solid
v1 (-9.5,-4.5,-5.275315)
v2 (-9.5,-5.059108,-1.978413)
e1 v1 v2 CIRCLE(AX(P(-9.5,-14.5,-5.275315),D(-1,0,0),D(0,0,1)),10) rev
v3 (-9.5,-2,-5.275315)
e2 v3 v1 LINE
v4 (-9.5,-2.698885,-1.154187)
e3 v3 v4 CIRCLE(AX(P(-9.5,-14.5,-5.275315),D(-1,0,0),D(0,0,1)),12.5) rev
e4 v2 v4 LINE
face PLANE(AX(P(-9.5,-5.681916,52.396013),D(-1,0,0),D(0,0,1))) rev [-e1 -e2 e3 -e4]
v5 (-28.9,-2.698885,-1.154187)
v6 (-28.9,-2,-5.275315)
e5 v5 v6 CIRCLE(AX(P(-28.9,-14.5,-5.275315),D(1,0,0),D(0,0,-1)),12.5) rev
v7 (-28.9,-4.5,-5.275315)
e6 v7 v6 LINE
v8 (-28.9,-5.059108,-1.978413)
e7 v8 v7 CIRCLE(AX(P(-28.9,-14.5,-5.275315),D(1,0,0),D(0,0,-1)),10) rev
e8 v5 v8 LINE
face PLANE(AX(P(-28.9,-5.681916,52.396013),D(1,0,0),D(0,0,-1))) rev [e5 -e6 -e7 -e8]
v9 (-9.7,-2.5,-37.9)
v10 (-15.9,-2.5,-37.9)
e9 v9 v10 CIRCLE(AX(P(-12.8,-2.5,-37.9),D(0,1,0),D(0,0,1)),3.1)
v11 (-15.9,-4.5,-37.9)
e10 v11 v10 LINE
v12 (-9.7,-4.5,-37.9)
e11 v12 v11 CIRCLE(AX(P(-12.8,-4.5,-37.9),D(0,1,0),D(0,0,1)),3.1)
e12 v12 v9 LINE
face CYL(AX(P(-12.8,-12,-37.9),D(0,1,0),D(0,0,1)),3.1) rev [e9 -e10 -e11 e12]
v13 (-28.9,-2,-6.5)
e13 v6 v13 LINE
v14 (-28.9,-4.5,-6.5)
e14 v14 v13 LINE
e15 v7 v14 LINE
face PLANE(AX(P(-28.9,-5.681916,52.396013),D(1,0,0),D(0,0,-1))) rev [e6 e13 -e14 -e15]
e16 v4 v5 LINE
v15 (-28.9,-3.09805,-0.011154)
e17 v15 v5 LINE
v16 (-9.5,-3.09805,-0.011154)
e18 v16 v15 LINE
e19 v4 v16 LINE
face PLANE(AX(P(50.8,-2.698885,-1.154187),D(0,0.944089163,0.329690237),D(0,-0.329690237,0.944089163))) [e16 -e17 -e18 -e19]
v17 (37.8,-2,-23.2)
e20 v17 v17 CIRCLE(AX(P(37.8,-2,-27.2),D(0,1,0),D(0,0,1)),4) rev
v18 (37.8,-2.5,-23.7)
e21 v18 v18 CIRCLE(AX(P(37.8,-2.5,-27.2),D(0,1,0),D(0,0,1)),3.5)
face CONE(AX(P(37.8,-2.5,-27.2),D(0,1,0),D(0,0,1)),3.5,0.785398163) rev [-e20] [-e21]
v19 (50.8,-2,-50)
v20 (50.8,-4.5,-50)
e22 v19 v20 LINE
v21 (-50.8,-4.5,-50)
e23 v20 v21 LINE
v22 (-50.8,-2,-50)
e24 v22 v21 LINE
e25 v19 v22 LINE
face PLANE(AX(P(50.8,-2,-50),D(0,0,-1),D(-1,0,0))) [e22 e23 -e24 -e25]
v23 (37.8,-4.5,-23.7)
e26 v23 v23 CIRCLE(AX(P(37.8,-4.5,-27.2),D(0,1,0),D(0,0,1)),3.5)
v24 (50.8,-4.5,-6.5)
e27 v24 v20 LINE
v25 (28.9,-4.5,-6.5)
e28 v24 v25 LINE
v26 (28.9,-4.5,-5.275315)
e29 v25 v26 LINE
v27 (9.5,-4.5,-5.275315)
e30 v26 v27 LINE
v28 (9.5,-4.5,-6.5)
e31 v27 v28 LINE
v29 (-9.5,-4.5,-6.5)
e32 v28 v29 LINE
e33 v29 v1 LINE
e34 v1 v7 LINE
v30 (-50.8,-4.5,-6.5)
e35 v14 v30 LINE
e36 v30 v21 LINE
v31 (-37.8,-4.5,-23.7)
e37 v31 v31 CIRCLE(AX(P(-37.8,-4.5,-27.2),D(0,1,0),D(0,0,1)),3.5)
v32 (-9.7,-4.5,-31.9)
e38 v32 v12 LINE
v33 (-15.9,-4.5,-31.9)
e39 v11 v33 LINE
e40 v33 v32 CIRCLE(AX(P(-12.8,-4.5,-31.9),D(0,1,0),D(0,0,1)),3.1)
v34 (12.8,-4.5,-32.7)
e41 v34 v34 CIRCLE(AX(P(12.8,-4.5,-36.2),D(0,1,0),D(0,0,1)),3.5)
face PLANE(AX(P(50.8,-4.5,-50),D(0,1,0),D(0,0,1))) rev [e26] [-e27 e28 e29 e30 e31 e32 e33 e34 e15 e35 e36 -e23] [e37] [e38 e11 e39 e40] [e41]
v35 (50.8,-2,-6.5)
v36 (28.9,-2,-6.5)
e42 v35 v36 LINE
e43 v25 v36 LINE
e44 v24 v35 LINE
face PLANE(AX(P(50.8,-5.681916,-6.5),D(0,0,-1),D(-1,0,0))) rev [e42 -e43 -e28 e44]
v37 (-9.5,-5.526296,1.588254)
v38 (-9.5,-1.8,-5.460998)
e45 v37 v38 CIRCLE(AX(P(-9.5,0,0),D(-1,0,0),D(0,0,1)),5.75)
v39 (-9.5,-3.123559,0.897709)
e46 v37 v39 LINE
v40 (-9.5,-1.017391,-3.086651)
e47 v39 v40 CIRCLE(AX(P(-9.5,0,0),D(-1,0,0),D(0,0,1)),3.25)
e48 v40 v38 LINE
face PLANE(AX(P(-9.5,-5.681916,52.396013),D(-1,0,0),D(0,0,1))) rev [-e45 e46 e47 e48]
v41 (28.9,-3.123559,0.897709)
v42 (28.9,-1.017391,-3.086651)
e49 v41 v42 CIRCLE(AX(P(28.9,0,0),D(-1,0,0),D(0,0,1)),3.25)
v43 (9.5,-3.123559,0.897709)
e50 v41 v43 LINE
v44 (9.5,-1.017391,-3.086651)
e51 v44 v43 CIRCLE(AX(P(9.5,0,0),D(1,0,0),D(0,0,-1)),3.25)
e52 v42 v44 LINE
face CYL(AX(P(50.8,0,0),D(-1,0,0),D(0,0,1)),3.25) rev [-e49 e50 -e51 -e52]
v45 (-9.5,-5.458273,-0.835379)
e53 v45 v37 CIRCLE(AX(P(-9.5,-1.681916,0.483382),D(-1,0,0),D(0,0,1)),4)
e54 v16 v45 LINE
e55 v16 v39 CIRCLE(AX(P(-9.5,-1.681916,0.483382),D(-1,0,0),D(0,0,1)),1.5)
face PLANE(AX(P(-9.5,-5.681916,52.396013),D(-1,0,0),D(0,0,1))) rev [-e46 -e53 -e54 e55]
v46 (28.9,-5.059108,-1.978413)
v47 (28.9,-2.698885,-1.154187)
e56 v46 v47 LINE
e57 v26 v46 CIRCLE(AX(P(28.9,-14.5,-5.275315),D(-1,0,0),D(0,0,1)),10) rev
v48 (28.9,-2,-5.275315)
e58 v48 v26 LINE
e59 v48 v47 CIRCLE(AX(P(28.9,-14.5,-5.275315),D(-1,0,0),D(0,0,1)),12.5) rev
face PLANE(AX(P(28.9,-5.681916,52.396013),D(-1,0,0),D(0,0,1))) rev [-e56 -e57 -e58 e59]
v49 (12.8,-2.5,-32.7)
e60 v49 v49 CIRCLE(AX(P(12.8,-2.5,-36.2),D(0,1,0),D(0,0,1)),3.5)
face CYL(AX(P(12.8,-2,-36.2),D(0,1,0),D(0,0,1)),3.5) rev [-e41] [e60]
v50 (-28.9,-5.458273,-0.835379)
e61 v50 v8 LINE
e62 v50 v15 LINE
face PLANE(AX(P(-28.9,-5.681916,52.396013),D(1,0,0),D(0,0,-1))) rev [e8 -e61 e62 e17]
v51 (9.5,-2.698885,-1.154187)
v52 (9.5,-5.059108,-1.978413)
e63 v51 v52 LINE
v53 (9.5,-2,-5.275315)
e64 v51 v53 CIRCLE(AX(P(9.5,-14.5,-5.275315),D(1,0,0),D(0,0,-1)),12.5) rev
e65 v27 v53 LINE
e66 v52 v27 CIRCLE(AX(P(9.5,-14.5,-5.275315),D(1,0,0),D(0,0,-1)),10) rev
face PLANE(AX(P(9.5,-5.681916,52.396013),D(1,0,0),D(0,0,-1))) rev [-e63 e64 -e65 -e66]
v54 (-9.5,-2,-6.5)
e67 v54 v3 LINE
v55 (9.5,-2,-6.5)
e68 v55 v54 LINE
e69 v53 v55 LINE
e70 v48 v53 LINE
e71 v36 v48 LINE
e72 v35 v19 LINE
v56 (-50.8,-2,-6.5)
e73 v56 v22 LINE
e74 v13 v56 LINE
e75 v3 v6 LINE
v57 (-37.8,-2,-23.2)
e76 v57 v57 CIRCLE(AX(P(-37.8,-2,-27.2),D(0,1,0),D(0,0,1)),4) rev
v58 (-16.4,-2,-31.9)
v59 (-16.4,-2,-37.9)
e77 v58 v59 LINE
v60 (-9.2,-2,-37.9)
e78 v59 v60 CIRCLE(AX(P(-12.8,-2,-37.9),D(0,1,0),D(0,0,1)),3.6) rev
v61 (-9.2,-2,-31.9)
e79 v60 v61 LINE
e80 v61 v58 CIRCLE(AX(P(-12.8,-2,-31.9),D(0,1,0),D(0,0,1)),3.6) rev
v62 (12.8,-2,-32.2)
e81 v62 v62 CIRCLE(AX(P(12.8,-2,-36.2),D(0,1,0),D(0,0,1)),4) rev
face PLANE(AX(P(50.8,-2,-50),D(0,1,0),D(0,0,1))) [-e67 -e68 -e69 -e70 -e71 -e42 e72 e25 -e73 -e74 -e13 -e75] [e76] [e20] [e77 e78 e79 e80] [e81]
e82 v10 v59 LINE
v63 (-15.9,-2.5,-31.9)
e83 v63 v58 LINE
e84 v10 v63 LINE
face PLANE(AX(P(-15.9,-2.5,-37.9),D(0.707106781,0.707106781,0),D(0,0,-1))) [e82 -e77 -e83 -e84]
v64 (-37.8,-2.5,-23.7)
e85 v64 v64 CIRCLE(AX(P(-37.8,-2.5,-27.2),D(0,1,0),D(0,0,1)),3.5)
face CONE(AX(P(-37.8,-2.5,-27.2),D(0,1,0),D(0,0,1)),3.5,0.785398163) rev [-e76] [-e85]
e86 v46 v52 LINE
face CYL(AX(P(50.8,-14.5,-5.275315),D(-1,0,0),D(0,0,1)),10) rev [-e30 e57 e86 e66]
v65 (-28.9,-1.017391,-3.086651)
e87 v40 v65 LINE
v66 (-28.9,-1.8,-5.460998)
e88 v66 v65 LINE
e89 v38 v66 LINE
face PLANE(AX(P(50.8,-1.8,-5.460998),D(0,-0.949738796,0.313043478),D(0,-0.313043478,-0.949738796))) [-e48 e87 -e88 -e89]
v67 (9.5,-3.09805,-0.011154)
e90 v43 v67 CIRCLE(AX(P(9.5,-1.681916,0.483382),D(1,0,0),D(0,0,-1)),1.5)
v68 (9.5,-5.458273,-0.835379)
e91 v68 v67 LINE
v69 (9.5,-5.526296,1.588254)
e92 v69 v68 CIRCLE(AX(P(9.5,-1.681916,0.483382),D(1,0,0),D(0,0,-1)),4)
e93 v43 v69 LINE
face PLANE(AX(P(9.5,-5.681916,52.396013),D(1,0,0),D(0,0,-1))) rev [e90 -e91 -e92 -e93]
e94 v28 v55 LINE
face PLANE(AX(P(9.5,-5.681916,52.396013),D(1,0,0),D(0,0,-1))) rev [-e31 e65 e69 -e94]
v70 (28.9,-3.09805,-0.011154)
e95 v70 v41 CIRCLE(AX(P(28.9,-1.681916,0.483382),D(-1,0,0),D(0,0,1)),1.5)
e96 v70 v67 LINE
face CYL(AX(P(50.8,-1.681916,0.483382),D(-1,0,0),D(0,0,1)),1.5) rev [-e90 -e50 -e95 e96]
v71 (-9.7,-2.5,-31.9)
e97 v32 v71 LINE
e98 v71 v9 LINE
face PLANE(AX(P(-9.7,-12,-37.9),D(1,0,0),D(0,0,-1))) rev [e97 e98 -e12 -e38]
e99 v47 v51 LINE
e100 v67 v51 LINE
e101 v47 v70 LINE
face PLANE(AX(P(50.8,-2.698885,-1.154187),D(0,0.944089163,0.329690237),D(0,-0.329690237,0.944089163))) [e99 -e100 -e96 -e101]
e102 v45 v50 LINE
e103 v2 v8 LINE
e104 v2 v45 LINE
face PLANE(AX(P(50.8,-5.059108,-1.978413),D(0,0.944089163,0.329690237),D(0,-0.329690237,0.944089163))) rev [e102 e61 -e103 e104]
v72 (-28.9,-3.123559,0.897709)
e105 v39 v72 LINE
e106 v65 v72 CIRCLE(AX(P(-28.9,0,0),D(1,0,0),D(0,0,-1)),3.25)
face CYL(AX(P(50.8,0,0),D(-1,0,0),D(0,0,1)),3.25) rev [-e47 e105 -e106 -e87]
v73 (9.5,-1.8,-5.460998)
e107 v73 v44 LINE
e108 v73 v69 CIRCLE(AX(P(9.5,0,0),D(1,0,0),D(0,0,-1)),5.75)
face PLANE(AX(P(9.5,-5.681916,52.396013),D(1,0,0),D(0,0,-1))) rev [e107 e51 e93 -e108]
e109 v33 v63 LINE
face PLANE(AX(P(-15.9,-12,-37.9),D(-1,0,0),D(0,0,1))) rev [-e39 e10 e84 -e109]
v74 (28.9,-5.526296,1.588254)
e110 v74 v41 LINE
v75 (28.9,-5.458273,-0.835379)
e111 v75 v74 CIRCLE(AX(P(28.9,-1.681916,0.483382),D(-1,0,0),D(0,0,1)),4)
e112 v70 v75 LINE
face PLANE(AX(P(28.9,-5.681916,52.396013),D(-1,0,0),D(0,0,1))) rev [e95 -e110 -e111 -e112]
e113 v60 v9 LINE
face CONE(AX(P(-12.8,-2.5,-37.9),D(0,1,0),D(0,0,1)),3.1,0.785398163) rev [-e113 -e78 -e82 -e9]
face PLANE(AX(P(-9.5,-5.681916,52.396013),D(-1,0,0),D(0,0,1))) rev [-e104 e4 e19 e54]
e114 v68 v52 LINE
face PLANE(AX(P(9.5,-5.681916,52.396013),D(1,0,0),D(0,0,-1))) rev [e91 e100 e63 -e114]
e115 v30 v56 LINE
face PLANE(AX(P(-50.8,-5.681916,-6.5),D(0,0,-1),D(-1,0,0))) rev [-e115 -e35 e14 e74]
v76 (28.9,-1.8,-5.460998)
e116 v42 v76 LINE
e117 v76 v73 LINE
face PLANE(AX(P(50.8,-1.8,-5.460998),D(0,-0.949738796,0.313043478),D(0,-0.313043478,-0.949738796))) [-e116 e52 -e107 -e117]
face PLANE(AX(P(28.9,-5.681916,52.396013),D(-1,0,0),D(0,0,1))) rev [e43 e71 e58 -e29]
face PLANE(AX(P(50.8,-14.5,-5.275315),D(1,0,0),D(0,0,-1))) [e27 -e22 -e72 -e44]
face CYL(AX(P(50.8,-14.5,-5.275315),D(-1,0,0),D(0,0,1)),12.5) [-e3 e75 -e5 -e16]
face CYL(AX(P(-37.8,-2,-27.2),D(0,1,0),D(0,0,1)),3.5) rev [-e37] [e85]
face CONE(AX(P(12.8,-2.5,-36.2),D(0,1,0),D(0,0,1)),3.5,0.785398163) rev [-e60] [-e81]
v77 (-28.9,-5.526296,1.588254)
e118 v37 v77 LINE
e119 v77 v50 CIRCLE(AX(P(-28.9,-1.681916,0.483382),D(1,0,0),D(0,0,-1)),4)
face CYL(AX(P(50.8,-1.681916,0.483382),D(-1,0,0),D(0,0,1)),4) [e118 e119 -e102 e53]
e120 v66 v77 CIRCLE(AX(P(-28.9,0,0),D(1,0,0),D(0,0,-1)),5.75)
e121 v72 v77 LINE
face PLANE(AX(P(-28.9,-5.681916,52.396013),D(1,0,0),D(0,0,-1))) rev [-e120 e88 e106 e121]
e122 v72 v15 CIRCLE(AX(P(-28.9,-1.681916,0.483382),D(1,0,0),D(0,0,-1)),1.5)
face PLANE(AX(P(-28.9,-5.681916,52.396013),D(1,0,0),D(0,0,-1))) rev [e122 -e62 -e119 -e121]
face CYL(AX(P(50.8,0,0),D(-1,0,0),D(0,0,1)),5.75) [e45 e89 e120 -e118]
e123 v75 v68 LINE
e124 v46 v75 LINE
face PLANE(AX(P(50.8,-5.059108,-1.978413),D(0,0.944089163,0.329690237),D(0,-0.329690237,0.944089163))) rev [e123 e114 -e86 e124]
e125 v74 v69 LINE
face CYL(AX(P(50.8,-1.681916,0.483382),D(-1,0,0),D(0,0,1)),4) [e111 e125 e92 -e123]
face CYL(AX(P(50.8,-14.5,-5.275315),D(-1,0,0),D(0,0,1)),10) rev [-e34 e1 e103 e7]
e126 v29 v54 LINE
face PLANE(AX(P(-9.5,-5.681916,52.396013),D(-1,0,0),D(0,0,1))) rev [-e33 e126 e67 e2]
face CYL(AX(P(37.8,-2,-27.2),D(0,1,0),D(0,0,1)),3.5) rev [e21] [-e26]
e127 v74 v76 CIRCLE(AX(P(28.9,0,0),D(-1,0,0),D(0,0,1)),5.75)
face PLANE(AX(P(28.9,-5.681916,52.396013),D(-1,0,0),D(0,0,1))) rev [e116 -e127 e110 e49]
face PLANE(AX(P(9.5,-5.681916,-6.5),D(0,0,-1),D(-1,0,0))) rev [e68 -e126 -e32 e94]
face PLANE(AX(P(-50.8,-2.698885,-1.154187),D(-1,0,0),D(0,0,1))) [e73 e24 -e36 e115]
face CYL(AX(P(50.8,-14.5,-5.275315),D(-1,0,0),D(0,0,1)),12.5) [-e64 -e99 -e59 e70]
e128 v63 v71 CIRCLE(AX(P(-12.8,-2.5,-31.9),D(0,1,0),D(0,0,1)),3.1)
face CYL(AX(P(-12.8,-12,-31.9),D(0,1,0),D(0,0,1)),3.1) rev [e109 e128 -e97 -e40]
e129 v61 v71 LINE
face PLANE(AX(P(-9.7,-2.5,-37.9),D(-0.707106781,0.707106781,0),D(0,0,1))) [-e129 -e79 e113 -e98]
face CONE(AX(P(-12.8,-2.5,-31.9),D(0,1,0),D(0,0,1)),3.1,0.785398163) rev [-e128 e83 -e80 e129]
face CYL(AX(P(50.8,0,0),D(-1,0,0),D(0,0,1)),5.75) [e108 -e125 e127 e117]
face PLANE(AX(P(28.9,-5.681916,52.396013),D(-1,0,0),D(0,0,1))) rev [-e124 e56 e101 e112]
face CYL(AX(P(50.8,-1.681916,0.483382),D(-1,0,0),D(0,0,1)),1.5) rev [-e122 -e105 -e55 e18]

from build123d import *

# Parameters (mm, degrees)
BASE_FLANGE1_DEPTH           = 50.8
CUT_EXTRUDE1_DEPTH           = 72.510156621
CUT_EXTRUDE1_DEPTH_BACK      = 72.510156621
SKETCH6_W                    = 21.9
SKETCH6_H                    = 58.896012785
SKETCH6_W_2                  = 19
F_7_0_7_DIAMETER_HOLE1_D     = 7
F_7_0_7_DIAMETER_HOLE1_DEPTH = 10
F_7_0_7_DIAMETER_HOLE1_TIP   = 2.103012167
CUT_EXTRUDE2_DEPTH           = 10
CHAMFER1_SIZE                = 0.5


# Sheet-metal steps are written as plain solids
with BuildPart() as part:
    # Sketch1 → Base-Flange1 (new, symmetric)
    with BuildSketch(Plane(origin=(0, 0, 0), x_dir=(0, 0, -1), z_dir=(1, 0, 0))):
        with BuildLine():
            Line((50, -4.5), (5.275314915, -4.5))
            ThreePointArc((5.275314915, -4.5), (3.603327521, -4.640767872), (1.978412548, -5.059108369))
            Line((1.978412548, -5.059108369), (0.835379329, -5.458272884))
            ThreePointArc((0.835379329, -5.458272884), (-0.371159142, -5.680341687), (-1.588253888, -5.526296191))
            ThreePointArc((-1.588253888, -5.526296191), (-2.687165368, 5.083467546), (5.460998077, -1.8))
            Line((5.460998077, -1.8), (3.086651087, -1.017391304))
            ThreePointArc((3.086651087, -1.017391304), (-1.518832599, 2.873264265), (-0.897708719, -3.123558716))
            ThreePointArc((-0.897708719, -3.123558716), (-0.44129819, -3.181325777), (0.011153737, -3.098049977))
            Line((0.011153737, -3.098049977), (1.154186957, -2.698885462))
            ThreePointArc((1.154186957, -2.698885462), (3.185330673, -2.17595984), (5.275314915, -2))
            Line((5.275314915, -2), (50, -2))
            Line((50, -2), (50, -4.5))
        make_face()
    extrude(amount=BASE_FLANGE1_DEPTH, both=True)

    # Sketch6 → Cut-Extrude1 (cut, two sides: drawn at the far end of the back side and taken through both)
    with BuildSketch(Plane(origin=(0, 0, 0), x_dir=(1, 0, 0), z_dir=(0, 1, 0)).offset(-CUT_EXTRUDE1_DEPTH_BACK)):
        with Locations((-39.85, -22.948006393)):
            Rectangle(SKETCH6_W, SKETCH6_H)
        with Locations((39.85, -22.948006393)):
            Rectangle(SKETCH6_W, SKETCH6_H)
        with Locations((0, -22.948006393)):
            Rectangle(SKETCH6_W_2, SKETCH6_H)
    extrude(amount=CUT_EXTRUDE1_DEPTH + CUT_EXTRUDE1_DEPTH_BACK, mode=Mode.SUBTRACT)

    # Ø7.0 (7) Diameter Hole1
    with Locations(Plane(origin=(0, -2, 0), x_dir=(1, 0, 0), z_dir=(0, 1, 0))):
        with Locations((37.8, 27.2), (-37.8, 27.2), (12.8, 36.2)):
            Hole(F_7_0_7_DIAMETER_HOLE1_D / 2, depth=F_7_0_7_DIAMETER_HOLE1_DEPTH)
            with Locations((0, 0, -(F_7_0_7_DIAMETER_HOLE1_DEPTH + F_7_0_7_DIAMETER_HOLE1_TIP / 2))):  # 118° drill point
                Cone(0, F_7_0_7_DIAMETER_HOLE1_D / 2, F_7_0_7_DIAMETER_HOLE1_TIP, mode=Mode.SUBTRACT)

    # Sketch9 → Cut-Extrude2 (cut)
    with BuildSketch(Plane(origin=(0, -2, 0), x_dir=(1, 0, 0), z_dir=(0, 1, 0))):
        with BuildLine():
            Line((-9.7, 37.9), (-9.7, 31.9))
            ThreePointArc((-9.7, 31.9), (-12.8, 28.8), (-15.9, 31.9))
            Line((-15.9, 31.9), (-15.9, 37.9))
            ThreePointArc((-15.9, 37.9), (-12.8, 41), (-9.7, 37.9))
        make_face()
    extrude(amount=-CUT_EXTRUDE2_DEPTH, mode=Mode.SUBTRACT)

    # Chamfer1
    chamfer1_edges = [part.edges().sort_by_distance(p)[0] for p in [
        (16.3, -2, -36.2),
        (-34.3, -2, -27.2),
        (41.3, -2, -27.2),
        (-12.8, -2, -41),
        (-15.9, -2, -34.9),
        (-12.8, -2, -28.8),
        (-9.7, -2, -34.9),
    ]]
    chamfer(chamfer1_edges, length=CHAMFER1_SIZE)


solid = part.part
